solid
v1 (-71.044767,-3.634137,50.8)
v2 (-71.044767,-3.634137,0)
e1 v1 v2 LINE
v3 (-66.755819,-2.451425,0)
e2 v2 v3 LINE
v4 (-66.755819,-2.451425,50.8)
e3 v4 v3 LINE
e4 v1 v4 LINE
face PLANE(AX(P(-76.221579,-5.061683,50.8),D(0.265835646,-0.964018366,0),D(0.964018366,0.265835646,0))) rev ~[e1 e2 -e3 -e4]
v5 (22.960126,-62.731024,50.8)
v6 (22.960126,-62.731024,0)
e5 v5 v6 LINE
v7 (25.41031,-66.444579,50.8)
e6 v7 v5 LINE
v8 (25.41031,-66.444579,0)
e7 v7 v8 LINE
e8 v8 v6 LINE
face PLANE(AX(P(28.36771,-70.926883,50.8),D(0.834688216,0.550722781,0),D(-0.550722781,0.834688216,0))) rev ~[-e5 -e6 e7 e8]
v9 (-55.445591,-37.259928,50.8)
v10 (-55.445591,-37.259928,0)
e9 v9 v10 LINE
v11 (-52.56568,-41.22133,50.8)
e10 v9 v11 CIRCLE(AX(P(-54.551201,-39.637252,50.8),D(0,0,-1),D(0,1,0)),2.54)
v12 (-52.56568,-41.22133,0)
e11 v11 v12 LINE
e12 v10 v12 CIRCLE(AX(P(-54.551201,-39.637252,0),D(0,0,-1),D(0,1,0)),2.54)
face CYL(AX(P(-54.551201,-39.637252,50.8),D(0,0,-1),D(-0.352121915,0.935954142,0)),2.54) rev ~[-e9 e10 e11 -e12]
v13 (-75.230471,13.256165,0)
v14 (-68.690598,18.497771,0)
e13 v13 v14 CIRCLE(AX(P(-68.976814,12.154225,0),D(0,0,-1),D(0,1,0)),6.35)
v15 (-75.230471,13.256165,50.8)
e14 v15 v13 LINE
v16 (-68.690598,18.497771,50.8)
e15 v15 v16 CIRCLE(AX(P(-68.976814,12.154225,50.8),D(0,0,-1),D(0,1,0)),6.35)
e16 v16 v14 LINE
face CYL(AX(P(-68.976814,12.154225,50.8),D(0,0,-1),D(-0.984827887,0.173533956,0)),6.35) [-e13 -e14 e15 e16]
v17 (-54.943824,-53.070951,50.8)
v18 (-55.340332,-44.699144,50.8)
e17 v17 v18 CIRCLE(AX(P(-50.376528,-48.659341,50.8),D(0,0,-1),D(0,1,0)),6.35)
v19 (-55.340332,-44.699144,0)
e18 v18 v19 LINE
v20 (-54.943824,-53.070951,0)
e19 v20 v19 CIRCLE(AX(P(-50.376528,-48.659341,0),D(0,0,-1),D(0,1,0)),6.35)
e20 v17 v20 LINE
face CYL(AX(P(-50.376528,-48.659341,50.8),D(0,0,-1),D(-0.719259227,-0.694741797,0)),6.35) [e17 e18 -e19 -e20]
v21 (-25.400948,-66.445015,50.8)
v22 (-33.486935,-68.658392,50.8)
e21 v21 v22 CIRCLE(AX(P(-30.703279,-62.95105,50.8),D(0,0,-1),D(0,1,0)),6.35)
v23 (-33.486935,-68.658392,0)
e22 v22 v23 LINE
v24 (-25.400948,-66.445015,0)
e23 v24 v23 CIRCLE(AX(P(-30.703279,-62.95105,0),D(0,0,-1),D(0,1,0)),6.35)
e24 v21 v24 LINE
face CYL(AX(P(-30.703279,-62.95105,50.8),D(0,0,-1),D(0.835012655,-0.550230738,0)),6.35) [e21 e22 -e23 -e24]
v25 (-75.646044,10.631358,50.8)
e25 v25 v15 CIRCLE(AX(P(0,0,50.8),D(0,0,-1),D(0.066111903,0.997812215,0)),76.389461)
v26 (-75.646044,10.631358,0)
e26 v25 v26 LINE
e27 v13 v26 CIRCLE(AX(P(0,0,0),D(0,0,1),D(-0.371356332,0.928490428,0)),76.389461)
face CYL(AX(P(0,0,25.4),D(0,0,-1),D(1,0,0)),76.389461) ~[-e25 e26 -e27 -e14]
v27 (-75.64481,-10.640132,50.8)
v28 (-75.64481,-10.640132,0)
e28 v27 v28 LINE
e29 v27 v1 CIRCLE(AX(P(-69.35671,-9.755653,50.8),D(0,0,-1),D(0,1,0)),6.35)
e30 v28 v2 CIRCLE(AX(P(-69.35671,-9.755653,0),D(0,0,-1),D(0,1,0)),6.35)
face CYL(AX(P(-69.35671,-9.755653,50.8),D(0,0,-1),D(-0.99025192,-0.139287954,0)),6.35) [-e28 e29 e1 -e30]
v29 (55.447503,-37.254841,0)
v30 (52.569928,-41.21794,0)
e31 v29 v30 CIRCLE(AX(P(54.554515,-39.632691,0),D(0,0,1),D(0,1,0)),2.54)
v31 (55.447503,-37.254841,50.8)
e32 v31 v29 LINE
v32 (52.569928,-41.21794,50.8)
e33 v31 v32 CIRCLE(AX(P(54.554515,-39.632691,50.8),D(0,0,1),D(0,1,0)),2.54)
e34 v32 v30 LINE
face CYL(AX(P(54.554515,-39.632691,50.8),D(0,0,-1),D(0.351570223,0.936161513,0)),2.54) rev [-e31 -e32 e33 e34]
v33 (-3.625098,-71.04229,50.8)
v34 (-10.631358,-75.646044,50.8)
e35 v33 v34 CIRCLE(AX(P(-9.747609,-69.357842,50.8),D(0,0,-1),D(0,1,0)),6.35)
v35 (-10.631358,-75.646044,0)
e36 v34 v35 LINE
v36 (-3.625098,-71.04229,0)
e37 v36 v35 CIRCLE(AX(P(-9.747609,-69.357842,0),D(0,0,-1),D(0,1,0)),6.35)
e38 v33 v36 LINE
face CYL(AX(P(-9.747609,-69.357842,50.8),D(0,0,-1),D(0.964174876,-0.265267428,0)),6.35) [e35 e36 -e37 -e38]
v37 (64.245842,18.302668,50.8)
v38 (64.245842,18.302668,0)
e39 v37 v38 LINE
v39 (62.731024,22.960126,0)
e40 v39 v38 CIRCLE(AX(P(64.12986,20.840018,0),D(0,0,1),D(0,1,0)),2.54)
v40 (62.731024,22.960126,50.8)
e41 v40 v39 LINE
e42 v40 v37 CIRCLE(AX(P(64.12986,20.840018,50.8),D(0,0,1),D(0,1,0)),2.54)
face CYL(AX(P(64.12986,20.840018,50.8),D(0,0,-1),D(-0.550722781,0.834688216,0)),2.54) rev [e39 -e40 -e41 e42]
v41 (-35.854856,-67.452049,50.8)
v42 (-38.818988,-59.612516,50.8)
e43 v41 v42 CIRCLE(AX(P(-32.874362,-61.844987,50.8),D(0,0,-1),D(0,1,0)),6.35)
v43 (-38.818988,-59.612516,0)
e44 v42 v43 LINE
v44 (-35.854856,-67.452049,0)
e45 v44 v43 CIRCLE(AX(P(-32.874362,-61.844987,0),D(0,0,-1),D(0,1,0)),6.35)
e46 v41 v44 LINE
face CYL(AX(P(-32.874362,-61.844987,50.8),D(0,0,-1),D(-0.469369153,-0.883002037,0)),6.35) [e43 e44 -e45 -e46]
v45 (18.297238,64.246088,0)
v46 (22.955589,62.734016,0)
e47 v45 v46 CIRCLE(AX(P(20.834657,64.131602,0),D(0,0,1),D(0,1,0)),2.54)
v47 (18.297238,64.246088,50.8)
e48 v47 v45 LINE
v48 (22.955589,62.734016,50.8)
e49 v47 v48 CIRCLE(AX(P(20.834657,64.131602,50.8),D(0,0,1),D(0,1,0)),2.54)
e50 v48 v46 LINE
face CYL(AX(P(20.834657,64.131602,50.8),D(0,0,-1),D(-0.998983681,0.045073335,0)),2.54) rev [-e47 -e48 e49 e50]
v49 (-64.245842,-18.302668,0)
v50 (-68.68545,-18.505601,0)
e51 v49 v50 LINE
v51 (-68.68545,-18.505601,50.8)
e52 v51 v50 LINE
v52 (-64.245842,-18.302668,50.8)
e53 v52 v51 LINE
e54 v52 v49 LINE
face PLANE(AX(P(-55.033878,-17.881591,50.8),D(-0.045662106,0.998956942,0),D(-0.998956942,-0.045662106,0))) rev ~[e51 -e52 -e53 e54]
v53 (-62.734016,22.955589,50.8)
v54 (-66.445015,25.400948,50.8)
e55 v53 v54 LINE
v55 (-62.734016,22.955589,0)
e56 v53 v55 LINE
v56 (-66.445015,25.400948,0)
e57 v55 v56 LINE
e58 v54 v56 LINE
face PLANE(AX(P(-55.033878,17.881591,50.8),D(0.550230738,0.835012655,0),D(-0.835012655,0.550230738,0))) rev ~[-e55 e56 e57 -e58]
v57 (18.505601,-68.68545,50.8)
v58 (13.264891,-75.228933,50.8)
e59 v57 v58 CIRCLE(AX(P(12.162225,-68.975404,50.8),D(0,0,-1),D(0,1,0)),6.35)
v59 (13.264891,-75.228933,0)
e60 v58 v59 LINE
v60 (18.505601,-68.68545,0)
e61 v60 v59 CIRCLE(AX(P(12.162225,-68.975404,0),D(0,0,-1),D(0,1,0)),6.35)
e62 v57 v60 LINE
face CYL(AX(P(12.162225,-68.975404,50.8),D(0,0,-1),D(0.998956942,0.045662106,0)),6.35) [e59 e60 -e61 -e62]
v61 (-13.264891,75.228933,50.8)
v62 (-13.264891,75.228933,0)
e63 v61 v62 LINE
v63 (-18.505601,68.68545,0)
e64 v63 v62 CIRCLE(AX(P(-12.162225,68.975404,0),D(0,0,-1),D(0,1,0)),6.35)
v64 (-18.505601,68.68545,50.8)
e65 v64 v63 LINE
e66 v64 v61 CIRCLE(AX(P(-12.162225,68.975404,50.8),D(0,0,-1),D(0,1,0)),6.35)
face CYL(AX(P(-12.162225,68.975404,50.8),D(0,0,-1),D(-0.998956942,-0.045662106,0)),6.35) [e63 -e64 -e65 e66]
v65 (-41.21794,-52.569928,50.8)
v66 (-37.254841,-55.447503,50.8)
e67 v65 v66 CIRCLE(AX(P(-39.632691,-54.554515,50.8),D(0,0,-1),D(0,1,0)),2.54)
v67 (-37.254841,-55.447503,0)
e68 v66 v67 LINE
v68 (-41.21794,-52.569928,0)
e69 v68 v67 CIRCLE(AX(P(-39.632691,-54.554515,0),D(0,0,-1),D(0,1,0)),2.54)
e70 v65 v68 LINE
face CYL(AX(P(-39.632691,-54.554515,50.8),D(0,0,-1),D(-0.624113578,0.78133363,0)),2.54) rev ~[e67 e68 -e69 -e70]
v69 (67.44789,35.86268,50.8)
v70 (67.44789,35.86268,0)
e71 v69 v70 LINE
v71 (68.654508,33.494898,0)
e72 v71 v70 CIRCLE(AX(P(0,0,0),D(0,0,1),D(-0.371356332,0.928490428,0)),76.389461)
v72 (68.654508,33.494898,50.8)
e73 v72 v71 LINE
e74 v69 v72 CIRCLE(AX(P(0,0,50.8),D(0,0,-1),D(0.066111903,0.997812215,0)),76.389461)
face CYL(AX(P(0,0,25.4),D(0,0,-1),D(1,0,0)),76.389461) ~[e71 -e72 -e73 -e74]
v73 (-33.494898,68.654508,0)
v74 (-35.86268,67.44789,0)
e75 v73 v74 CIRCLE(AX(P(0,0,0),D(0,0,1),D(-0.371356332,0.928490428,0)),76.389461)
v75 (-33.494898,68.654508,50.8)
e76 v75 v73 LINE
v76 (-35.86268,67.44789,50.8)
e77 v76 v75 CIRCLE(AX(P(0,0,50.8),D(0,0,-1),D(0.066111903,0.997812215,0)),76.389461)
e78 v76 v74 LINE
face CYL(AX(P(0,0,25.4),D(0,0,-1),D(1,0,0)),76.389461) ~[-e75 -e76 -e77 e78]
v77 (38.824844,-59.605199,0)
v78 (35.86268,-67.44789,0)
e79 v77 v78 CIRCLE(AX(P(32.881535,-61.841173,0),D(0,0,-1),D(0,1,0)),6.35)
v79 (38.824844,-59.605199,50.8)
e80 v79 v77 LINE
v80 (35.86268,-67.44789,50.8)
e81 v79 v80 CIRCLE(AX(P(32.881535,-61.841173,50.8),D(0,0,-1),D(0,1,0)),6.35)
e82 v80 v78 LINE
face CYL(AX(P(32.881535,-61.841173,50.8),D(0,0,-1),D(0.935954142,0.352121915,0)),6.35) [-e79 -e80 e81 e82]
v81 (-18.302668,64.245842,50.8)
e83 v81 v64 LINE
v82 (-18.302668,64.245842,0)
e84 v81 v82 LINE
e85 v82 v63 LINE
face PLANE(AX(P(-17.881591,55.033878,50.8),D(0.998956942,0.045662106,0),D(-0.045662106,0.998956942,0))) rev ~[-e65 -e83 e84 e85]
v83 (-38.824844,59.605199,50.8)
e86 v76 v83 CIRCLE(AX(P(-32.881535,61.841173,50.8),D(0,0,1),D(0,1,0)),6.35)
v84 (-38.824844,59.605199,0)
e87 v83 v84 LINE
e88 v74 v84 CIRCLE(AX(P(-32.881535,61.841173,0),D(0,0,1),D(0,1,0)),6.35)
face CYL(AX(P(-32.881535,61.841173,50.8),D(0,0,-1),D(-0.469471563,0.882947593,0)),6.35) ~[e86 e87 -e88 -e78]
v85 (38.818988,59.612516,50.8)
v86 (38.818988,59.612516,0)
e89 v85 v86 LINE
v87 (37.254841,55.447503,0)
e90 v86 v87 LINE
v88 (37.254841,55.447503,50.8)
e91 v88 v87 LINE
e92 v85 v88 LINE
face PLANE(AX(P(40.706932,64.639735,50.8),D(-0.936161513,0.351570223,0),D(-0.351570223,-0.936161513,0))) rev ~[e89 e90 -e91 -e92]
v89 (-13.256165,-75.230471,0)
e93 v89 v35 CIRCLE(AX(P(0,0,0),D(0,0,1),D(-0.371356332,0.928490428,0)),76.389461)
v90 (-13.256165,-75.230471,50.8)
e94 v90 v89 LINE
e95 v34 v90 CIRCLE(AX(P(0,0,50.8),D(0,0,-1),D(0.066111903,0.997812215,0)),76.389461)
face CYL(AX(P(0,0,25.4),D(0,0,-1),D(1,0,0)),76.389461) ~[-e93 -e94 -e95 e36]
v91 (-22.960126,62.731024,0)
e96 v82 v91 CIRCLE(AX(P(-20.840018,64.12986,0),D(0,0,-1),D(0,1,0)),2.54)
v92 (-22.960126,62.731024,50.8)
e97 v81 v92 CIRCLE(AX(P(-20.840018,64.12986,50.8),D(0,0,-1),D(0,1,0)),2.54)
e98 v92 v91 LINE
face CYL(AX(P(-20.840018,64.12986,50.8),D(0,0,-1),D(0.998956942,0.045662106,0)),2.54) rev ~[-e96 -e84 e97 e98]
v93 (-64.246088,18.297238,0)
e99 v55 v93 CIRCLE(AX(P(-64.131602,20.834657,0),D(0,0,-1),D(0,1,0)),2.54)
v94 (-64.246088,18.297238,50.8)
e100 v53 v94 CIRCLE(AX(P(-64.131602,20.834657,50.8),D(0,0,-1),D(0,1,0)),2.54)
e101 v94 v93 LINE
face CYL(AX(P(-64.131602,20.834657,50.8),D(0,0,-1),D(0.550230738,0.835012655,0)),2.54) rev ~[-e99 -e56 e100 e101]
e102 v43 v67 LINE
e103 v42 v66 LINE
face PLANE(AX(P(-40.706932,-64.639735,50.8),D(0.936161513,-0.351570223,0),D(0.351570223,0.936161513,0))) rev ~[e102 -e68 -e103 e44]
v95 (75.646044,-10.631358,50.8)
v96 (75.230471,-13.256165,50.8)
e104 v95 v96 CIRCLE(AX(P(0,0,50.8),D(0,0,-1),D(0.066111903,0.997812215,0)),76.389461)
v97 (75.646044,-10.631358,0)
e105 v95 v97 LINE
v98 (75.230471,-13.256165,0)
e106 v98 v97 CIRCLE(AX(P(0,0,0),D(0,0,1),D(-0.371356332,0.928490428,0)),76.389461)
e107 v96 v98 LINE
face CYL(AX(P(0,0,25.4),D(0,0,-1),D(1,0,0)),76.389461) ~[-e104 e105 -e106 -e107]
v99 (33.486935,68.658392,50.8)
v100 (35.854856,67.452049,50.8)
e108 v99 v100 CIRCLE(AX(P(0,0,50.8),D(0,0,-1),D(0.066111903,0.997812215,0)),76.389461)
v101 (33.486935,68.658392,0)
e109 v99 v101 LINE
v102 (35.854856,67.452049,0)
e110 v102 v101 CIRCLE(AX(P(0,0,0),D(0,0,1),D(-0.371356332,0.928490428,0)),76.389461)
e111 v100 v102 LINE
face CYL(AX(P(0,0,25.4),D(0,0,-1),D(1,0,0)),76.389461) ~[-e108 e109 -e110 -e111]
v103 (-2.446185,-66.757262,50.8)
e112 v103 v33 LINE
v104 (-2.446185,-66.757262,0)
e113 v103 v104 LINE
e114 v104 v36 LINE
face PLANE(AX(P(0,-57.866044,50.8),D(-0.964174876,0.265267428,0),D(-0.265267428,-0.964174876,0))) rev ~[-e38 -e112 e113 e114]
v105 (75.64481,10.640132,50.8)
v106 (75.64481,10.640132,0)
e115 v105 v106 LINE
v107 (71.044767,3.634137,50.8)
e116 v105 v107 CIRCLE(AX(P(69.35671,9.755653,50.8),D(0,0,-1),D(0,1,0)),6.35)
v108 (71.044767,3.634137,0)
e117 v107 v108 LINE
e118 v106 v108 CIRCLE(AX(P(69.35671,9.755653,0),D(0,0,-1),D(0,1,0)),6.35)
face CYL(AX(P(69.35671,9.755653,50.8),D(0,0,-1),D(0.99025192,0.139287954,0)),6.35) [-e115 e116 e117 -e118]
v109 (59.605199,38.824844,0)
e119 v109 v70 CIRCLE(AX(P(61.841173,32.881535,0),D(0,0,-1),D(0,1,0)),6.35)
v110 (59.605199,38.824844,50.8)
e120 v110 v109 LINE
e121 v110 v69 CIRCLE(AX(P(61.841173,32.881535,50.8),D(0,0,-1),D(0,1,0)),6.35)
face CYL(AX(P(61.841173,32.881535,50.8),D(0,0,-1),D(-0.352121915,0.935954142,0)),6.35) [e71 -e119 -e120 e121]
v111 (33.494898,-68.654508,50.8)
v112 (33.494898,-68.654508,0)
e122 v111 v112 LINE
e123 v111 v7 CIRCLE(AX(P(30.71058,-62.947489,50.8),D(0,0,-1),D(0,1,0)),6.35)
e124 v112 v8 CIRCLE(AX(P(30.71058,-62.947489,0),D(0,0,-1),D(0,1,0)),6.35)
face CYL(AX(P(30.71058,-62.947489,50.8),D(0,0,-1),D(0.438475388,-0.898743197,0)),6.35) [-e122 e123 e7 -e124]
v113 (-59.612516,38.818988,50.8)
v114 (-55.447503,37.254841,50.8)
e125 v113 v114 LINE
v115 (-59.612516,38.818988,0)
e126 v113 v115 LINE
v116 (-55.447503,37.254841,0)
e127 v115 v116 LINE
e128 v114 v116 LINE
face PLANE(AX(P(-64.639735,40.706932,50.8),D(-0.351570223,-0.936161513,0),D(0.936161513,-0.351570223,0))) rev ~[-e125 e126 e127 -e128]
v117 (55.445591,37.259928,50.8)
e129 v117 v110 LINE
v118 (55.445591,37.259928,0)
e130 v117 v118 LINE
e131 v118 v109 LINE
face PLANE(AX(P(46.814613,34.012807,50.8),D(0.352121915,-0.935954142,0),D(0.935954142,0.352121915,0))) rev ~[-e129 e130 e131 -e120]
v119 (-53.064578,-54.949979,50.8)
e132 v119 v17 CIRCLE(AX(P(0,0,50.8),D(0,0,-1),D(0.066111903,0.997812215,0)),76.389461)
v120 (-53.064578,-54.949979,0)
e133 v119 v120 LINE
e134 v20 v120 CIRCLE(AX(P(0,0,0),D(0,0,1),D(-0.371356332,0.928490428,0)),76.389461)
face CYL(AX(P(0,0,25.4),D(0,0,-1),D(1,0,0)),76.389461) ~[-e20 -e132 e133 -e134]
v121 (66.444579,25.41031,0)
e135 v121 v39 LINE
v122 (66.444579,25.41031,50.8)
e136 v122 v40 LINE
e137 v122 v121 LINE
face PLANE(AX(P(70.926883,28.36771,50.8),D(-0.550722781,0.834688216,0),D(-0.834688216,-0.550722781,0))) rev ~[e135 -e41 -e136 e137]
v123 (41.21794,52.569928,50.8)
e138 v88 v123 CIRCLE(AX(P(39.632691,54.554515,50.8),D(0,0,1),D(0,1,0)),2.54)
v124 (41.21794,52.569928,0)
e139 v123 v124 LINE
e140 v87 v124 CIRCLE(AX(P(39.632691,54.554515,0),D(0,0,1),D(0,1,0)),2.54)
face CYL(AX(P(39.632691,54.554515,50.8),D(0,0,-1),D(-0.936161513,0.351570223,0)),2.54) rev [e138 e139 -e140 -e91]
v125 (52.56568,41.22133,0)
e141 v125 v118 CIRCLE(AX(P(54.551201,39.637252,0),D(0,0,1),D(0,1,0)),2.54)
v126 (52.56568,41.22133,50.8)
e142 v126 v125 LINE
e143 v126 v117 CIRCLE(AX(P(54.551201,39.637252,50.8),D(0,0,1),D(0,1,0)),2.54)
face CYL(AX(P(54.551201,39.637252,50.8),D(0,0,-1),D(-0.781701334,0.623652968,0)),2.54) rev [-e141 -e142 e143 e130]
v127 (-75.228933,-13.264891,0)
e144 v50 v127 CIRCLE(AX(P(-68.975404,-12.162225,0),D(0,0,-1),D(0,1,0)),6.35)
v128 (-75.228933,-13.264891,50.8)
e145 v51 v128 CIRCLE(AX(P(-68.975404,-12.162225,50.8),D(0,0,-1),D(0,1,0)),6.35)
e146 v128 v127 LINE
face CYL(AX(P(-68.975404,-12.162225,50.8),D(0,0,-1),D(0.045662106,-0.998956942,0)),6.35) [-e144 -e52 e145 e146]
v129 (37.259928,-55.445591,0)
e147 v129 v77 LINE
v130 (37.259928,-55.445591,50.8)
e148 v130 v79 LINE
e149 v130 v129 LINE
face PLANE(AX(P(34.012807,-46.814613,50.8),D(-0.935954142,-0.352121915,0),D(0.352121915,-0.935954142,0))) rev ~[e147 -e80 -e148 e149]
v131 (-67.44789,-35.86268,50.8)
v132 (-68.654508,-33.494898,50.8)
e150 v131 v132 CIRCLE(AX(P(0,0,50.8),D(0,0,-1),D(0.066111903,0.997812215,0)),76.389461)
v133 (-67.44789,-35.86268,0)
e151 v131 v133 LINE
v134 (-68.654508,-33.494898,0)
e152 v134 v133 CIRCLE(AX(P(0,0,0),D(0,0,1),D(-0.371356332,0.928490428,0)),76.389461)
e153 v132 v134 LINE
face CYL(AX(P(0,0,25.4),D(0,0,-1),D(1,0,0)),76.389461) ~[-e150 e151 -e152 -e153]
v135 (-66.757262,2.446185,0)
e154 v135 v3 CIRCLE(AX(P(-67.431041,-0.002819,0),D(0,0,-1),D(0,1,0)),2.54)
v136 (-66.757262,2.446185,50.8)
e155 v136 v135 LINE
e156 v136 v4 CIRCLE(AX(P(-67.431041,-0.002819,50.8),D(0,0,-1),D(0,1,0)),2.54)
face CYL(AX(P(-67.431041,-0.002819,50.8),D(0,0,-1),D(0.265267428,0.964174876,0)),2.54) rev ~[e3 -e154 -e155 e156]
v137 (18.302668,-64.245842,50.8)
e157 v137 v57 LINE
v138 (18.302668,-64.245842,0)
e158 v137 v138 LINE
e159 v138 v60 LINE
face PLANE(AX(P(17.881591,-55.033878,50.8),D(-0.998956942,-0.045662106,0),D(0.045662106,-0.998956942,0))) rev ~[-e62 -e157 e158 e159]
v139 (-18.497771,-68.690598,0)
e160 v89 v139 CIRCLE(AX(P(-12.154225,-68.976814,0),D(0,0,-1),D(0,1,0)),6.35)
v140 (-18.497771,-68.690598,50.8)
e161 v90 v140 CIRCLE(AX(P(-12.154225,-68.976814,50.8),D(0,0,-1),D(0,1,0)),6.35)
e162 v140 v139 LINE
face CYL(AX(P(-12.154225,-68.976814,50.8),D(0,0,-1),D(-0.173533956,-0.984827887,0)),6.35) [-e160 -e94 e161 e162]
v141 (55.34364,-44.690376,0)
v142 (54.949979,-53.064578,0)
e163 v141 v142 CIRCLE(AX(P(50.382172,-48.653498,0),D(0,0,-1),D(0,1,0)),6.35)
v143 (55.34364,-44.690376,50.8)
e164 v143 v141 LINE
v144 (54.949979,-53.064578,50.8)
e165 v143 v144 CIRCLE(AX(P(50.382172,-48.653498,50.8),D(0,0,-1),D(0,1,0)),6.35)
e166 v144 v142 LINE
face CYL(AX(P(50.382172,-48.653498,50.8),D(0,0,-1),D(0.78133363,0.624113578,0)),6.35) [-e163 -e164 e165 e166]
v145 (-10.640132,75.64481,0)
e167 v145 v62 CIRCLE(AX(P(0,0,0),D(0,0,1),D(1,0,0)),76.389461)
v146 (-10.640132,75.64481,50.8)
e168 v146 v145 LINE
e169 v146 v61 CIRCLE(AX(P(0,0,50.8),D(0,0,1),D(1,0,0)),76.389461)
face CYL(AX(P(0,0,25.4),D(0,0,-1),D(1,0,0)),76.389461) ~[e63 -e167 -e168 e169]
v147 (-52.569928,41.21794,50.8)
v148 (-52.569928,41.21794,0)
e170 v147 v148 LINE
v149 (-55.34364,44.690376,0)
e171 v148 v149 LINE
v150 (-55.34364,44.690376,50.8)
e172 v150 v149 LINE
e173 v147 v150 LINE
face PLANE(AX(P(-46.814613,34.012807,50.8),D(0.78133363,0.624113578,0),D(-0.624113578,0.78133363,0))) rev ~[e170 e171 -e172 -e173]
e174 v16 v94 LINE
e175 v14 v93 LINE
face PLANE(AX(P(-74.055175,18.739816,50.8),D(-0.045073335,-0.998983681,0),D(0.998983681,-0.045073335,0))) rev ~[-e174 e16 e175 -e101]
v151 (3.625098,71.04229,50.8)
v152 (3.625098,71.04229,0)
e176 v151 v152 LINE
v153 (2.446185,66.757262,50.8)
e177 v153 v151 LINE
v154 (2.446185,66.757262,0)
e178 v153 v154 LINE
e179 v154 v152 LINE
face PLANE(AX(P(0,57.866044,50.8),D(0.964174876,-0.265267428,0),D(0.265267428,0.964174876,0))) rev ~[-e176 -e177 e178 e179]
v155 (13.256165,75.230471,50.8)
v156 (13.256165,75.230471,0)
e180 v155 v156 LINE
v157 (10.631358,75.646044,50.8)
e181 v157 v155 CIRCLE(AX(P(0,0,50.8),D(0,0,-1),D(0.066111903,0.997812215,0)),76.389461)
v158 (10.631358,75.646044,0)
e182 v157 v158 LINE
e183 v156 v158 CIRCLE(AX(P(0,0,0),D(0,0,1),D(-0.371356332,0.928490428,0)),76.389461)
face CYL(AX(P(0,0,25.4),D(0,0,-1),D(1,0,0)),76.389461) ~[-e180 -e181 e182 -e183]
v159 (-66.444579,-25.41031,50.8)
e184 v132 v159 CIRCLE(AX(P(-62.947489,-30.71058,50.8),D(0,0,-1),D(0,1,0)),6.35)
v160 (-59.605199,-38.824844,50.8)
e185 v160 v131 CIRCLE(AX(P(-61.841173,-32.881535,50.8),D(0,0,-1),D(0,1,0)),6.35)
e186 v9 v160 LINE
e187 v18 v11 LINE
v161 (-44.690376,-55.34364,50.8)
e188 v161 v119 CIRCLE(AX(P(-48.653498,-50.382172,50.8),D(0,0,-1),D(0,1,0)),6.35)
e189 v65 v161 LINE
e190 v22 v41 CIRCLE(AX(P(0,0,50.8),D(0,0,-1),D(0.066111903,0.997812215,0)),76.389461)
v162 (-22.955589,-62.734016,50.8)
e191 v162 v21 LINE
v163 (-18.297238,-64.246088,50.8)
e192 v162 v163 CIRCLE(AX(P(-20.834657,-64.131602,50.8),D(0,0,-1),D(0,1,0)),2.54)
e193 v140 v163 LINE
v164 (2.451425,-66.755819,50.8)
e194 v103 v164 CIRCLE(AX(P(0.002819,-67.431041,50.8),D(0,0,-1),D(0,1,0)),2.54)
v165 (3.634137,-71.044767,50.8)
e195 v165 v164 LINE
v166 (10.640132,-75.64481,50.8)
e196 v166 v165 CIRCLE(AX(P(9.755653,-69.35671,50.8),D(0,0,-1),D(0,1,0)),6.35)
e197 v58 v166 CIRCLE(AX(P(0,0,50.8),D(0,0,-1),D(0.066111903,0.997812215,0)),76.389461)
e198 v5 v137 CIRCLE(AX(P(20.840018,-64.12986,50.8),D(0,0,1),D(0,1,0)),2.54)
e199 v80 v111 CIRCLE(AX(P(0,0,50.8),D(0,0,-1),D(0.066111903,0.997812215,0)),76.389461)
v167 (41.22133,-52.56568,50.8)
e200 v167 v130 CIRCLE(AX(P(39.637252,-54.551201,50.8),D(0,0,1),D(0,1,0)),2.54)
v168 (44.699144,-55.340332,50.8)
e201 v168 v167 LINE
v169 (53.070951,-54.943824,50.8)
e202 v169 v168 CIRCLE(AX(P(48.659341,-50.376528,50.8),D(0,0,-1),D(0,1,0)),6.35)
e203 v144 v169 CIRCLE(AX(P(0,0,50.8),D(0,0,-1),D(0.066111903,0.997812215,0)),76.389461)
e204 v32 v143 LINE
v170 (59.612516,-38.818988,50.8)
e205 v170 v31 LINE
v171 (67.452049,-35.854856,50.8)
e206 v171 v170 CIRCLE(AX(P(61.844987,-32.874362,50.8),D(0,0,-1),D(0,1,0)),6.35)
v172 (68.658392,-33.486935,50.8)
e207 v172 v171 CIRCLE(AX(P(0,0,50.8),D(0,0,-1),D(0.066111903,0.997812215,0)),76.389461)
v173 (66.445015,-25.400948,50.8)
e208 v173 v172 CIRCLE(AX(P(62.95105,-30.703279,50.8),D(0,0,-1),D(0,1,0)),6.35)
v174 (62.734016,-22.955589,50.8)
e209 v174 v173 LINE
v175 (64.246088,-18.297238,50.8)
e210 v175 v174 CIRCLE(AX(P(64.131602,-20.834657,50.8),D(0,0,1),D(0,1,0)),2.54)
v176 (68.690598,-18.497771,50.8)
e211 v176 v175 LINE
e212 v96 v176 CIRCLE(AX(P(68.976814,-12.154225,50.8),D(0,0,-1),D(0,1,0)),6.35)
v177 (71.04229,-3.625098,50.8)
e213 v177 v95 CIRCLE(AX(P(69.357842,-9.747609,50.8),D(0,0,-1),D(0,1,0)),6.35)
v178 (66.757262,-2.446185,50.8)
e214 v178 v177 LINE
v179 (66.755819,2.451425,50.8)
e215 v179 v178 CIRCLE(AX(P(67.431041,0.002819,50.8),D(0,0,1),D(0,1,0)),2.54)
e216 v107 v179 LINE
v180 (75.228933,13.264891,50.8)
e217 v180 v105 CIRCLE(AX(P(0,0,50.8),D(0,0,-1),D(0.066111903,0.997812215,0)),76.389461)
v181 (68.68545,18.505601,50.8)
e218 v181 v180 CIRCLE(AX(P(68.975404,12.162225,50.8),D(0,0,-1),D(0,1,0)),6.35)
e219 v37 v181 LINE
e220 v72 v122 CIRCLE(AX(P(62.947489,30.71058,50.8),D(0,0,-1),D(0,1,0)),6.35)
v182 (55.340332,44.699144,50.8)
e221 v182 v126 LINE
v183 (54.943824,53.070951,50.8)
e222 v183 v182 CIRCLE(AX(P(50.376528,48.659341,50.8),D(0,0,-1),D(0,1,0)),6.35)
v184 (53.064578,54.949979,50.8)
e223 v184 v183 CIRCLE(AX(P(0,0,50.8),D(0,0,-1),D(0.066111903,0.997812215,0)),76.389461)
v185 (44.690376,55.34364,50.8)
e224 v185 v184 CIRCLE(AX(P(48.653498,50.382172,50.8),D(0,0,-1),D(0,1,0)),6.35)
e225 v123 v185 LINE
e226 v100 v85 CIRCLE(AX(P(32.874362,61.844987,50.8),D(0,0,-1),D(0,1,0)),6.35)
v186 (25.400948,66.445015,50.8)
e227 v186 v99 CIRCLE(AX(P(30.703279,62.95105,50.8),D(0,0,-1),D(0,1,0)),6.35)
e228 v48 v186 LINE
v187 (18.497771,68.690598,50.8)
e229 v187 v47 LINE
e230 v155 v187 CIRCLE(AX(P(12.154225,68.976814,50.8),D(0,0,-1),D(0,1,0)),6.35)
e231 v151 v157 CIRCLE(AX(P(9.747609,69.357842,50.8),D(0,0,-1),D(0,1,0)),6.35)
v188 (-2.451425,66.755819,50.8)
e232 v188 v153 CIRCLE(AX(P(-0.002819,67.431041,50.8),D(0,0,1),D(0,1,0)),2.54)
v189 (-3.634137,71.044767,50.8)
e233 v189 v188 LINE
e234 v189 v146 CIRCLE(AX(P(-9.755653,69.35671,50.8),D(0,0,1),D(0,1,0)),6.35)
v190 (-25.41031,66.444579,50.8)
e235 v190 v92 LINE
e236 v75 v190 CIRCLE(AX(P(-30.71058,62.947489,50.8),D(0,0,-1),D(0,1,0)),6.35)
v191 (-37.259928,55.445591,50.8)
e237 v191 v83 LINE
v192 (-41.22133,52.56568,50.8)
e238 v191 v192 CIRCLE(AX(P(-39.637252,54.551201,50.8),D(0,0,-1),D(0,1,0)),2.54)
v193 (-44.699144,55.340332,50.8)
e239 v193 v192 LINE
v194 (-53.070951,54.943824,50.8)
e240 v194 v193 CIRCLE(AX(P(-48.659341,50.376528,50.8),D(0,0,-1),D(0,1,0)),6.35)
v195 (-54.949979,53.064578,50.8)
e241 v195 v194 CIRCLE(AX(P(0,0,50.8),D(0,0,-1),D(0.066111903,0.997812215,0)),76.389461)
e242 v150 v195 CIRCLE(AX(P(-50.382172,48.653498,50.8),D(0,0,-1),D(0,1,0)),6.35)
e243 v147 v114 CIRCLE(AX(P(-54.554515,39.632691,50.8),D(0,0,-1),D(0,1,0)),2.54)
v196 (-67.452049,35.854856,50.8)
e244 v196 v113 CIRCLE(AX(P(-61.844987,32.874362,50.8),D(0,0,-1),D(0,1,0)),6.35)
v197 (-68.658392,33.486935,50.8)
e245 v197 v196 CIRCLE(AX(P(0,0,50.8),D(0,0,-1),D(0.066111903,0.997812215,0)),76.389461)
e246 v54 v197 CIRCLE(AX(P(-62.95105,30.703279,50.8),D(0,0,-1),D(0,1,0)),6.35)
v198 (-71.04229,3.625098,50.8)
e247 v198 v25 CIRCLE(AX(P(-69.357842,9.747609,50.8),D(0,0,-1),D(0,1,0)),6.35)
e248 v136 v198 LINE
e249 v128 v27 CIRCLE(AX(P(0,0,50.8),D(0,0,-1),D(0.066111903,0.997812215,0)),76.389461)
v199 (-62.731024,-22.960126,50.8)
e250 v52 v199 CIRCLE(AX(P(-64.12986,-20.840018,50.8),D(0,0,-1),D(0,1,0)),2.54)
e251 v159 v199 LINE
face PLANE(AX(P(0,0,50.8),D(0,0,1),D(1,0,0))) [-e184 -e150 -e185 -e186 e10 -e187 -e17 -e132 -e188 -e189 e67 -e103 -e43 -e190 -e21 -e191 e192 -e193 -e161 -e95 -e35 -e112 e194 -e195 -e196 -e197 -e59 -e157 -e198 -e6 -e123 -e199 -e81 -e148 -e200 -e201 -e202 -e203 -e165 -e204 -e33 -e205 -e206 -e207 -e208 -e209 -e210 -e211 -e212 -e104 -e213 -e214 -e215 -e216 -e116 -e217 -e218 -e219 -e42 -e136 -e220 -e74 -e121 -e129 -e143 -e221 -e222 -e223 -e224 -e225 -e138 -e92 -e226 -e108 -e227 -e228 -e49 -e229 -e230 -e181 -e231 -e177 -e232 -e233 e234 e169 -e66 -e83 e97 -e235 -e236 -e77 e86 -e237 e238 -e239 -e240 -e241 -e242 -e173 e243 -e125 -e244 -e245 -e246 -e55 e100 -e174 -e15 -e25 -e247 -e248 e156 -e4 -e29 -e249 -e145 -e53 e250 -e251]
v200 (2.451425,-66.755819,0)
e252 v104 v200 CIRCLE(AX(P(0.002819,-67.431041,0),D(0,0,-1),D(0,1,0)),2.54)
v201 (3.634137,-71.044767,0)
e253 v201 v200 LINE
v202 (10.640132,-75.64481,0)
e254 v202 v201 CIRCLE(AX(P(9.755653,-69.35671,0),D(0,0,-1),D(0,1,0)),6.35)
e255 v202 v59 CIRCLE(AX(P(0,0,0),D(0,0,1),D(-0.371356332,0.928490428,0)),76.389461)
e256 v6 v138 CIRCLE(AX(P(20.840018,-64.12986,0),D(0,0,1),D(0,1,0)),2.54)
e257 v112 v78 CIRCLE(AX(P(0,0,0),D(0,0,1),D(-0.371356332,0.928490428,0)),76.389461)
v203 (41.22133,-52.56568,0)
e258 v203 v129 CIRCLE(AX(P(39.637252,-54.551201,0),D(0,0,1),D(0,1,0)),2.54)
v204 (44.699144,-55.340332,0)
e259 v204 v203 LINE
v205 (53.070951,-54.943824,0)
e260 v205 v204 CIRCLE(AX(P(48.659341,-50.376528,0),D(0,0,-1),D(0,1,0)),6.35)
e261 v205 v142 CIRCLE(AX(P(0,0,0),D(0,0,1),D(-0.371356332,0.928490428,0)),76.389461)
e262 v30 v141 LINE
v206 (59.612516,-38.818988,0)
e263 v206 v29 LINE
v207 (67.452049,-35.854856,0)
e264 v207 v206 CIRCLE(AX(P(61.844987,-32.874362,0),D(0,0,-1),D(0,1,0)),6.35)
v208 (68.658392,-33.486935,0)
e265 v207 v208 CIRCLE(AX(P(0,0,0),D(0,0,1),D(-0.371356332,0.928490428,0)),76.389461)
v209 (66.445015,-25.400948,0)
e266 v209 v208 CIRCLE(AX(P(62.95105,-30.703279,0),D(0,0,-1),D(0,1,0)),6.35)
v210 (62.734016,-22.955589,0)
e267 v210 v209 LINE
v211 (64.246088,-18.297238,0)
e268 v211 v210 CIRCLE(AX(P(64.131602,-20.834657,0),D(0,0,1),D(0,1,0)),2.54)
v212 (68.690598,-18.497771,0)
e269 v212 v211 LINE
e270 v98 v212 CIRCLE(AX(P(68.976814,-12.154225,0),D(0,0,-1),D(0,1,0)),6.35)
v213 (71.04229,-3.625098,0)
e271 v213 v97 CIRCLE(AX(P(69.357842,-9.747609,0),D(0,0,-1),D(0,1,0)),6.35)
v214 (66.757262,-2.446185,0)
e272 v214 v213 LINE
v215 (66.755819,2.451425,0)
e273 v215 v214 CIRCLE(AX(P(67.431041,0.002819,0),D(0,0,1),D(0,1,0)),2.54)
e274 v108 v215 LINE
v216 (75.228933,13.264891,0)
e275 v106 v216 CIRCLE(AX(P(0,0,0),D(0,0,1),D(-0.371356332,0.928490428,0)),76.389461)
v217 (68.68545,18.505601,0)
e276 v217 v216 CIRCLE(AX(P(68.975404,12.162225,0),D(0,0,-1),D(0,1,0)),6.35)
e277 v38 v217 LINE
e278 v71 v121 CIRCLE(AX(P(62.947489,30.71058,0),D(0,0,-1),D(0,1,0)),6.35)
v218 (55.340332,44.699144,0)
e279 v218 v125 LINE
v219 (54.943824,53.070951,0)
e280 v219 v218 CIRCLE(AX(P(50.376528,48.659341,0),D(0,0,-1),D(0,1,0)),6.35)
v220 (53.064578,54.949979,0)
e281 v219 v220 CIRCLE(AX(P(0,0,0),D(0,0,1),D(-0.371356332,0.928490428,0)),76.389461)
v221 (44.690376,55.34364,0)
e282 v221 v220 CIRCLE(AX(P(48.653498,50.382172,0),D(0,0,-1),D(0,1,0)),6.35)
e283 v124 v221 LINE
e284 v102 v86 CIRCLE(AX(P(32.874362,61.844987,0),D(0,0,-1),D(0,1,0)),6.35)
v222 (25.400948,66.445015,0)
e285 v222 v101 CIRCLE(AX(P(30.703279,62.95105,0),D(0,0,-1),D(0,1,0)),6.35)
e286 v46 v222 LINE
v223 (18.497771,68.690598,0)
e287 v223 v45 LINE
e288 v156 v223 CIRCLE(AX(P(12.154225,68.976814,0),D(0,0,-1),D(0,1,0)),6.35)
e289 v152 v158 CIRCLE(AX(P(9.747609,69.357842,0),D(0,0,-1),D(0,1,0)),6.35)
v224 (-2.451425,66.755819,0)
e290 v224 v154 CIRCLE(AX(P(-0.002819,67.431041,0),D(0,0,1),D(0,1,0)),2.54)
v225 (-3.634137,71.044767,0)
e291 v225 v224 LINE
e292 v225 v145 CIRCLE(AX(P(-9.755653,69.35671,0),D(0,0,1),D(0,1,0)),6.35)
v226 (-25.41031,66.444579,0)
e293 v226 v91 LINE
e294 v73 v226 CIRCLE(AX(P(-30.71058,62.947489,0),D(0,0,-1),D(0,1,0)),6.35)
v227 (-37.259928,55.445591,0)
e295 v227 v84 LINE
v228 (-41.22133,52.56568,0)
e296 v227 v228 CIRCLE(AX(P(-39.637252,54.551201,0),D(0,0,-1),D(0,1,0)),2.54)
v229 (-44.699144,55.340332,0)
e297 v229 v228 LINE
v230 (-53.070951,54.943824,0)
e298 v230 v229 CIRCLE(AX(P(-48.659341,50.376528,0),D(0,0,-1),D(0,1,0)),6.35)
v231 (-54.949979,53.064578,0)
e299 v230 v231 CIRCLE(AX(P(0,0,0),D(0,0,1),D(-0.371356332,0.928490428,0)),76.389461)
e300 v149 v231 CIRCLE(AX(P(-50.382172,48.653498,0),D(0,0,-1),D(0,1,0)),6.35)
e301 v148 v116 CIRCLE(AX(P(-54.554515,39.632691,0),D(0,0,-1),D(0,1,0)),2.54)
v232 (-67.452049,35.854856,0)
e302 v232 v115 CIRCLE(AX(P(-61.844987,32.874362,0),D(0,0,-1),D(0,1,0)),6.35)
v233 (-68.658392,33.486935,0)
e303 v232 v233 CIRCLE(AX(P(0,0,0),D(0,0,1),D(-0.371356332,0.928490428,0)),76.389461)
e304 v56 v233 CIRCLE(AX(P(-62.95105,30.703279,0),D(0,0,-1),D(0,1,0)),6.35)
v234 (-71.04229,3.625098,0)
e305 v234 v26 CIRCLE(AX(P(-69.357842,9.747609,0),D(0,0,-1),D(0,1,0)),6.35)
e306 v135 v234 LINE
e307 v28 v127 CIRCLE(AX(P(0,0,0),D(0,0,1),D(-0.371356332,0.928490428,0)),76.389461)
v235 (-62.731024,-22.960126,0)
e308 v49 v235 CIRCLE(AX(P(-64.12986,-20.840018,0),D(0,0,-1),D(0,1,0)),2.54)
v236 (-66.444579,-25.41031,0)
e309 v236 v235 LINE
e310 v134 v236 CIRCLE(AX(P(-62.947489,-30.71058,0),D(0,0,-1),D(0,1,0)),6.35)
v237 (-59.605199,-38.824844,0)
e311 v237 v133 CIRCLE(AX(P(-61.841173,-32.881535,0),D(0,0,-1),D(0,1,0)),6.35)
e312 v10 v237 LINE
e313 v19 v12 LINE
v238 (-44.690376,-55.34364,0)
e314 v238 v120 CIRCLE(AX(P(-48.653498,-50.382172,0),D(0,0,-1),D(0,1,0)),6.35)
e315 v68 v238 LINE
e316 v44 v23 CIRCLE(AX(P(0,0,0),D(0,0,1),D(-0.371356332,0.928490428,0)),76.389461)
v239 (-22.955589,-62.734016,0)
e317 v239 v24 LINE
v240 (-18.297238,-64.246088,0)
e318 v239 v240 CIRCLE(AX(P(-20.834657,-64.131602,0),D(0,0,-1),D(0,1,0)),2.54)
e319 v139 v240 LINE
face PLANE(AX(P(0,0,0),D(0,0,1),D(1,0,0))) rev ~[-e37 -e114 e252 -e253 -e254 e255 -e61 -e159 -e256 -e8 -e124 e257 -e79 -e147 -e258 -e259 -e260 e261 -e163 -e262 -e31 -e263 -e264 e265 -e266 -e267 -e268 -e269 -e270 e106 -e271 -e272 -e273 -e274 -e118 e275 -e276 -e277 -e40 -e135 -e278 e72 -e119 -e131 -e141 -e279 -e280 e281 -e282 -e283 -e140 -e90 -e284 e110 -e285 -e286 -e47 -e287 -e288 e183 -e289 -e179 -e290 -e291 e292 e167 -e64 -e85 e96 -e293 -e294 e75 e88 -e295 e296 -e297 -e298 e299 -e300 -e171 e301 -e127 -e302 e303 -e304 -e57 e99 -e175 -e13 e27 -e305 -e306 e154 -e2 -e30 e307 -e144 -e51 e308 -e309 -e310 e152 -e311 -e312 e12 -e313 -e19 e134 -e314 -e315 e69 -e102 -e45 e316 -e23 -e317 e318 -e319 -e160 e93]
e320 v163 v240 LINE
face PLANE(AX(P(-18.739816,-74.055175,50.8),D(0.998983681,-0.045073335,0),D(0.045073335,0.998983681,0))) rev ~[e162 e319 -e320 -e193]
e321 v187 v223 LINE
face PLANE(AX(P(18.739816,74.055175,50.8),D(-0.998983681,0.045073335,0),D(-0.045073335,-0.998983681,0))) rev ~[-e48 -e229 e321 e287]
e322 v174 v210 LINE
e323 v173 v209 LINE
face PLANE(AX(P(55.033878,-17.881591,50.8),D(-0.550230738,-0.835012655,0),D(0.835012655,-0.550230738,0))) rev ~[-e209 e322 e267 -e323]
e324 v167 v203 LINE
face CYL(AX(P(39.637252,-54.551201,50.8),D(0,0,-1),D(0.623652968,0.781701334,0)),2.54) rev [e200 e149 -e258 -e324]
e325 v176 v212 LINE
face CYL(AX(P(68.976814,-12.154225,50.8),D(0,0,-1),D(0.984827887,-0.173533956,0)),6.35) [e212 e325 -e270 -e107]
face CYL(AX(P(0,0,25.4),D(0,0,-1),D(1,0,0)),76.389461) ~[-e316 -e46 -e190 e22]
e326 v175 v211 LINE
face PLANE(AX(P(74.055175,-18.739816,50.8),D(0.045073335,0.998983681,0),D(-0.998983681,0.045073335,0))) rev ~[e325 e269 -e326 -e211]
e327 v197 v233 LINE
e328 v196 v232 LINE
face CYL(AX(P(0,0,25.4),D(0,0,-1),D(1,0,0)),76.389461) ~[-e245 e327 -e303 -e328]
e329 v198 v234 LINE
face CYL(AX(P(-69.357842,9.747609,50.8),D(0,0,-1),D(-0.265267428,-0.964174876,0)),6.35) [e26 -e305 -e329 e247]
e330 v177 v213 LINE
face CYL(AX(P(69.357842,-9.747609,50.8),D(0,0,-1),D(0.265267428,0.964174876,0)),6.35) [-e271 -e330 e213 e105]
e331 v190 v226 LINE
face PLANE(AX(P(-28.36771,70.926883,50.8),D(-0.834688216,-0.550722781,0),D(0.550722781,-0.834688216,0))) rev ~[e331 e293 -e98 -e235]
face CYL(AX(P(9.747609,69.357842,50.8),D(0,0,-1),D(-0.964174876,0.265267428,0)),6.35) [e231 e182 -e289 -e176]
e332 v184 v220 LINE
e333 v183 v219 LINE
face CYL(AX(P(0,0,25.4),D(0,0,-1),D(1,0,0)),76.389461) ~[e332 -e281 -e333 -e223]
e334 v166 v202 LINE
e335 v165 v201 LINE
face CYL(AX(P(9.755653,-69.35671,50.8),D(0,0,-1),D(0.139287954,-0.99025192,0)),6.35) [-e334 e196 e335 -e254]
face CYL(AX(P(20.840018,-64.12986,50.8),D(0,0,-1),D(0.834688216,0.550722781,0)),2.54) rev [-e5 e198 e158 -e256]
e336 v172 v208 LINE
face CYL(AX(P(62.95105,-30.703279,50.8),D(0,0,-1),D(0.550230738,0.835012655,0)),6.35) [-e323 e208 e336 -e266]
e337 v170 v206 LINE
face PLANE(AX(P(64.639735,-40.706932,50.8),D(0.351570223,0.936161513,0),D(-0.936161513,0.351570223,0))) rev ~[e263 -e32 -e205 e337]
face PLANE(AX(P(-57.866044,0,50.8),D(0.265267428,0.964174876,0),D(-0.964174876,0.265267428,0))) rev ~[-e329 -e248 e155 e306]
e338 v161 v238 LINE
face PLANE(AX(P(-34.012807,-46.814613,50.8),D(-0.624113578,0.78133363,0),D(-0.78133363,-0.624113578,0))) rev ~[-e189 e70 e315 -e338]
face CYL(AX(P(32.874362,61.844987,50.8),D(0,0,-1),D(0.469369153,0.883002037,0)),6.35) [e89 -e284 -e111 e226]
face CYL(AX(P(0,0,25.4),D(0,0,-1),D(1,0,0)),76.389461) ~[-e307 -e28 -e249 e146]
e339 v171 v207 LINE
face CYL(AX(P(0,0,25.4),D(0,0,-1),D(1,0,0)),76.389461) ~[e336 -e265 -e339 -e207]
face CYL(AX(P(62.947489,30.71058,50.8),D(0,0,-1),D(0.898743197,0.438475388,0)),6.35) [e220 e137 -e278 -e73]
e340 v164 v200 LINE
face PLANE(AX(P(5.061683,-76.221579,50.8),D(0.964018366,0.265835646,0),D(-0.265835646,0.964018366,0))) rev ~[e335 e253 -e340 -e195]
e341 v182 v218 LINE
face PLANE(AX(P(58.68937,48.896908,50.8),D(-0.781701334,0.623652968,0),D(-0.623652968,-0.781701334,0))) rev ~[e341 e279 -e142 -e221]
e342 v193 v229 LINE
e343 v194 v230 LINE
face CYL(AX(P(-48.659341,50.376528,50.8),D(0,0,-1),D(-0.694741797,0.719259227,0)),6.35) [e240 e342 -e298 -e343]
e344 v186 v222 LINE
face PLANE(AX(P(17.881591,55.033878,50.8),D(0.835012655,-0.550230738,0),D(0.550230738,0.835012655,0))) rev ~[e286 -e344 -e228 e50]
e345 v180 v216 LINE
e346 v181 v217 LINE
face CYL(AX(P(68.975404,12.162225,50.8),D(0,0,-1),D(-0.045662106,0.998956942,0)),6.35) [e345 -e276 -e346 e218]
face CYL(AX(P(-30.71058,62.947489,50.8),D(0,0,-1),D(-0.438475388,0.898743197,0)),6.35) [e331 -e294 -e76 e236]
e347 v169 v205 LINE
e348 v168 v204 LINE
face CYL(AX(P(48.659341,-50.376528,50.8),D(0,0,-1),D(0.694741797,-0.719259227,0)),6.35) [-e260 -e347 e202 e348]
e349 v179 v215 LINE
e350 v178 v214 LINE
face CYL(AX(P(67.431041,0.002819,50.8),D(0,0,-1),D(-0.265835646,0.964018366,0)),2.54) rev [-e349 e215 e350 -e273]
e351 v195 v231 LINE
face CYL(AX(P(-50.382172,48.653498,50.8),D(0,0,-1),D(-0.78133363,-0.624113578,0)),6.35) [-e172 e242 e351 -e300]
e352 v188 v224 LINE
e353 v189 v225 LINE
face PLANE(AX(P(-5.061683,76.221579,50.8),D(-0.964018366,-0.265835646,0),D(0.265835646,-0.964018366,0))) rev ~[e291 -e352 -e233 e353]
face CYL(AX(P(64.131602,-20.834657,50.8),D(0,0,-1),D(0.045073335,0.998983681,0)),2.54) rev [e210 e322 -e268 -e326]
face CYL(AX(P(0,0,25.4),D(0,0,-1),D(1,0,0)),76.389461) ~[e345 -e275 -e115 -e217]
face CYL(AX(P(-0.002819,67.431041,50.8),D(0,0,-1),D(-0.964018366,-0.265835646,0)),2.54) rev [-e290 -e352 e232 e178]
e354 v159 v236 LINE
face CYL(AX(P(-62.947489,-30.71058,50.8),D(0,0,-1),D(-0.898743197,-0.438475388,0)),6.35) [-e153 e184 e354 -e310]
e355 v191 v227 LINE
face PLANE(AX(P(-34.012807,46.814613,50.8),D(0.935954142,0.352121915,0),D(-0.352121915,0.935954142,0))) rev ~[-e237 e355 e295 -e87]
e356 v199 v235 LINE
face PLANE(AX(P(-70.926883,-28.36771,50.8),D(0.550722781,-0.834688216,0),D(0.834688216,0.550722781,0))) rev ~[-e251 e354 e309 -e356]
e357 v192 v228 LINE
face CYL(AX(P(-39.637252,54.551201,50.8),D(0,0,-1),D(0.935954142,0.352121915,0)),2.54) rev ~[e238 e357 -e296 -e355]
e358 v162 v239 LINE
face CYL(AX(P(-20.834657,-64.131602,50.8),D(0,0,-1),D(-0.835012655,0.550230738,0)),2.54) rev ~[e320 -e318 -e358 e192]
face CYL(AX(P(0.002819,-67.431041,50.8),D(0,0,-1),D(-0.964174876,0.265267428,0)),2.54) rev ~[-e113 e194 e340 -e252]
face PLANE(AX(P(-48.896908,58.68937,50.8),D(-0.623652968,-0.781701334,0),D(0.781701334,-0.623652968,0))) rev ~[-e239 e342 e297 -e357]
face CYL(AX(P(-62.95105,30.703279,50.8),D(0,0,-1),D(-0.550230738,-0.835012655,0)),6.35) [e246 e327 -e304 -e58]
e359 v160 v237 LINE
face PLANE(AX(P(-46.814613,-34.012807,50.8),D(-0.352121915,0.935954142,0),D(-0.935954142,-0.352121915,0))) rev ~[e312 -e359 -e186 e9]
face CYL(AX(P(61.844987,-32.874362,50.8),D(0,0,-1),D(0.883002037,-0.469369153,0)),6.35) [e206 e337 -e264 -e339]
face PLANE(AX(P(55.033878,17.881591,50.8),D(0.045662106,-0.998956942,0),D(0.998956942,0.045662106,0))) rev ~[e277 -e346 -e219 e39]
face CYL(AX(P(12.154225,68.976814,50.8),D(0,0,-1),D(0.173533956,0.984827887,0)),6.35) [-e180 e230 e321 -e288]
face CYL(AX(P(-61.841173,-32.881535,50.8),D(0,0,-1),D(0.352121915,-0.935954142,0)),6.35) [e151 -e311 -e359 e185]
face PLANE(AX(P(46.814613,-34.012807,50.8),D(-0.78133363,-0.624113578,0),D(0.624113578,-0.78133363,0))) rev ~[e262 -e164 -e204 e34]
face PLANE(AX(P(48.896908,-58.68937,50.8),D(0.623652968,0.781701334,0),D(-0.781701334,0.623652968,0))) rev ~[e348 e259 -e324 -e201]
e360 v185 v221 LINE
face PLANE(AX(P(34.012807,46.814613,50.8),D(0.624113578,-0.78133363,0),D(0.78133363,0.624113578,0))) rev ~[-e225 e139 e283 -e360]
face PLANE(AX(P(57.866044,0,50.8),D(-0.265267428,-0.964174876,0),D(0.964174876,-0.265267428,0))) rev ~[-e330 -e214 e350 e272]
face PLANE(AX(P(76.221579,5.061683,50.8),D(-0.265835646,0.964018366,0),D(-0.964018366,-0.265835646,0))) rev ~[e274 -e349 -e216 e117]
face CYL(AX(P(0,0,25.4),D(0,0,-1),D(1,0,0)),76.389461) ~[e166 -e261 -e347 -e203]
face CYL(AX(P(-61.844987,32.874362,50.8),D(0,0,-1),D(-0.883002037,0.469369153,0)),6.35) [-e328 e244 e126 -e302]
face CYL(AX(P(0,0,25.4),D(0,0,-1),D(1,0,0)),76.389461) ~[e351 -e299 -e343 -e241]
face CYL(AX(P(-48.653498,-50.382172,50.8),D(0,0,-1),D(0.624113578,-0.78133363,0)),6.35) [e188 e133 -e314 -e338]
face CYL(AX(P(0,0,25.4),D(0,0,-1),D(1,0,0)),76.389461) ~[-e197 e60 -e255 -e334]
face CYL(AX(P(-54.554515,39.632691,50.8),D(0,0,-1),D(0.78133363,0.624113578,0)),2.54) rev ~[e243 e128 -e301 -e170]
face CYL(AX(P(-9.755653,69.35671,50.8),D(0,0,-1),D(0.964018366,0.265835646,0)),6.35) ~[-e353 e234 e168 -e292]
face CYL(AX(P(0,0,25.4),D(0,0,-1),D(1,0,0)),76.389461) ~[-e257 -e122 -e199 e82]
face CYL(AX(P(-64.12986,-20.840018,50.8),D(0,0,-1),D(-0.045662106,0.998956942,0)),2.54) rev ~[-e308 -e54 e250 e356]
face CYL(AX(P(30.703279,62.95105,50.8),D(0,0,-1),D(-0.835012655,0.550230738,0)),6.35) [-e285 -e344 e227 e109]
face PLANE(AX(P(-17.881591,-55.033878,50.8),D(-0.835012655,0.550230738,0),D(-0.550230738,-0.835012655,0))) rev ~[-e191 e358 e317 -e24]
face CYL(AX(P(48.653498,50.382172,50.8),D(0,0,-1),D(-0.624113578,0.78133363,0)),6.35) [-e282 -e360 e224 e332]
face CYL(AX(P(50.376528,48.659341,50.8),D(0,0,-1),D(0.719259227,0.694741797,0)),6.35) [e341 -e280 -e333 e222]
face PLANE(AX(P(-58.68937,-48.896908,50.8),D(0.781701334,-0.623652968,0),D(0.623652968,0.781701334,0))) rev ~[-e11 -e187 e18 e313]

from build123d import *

# Parameters (mm, degrees)
F0_R            = 76.3894607231
F1_DEPTH        = 25.4
F2_DEPTH        = 25.4
F4_DEPTH        = 50.8
F4_COPIES_COUNT = 20
F5_R            = 6.35
F6_R            = 2.54


# Not quite as in the source:
# - a pattern or mirror of a feature is missing from the dataset's text; its kind, count and spacing are read off the source's solid


with BuildPart() as f1:
    # F0 (on Top) → F1 (new body)
    with BuildSketch(Plane.XY):
        Circle(F0_R)
    extrude(amount=F1_DEPTH)

    # F2 (add): a face of the model
    f2_faces = [f1.faces().sort_by_distance(p)[0] for p in [
        (0, 0, 25.4),
    ]]
    extrude(f2_faces, amount=F2_DEPTH)

    # F3 (on face) → F4 (cut)
    with BuildSketch(Plane.XY.offset(50.8)):
        with BuildLine():
            ThreePointArc((5.0502526328, 76.2223370011), (-0.0057278173, 76.3894605084), (-5.0616831482, 76.2215787902))
            Line((-5.0616831482, 76.2215787902), (0, 57.8660437425))
            Line((0, 57.8660437425), (5.0502526328, 76.2223370011))
        make_face()
    f4 = extrude(amount=-F4_DEPTH, mode=Mode.SUBTRACT)

    # F4_copies: F4 ×20 about axis
    f4_copies_axis = Axis((0, 0, 0), (0, 0, 1))
    for i in range(1, F4_COPIES_COUNT):
        add(f4.rotate(f4_copies_axis, i * 360 / F4_COPIES_COUNT), mode=Mode.SUBTRACT)

    # F5
    f5_edges = [f1.edges().sort_by_distance(p)[0] for p in [
        (-5.061683, 76.221579, 25.4),
        (5.050253, 76.222337, 25.4),
        (-18.750922, 74.052364, 25.4),
        (18.739816, 74.055175, 25.4),
        (28.357073, 70.931136, 25.4),
        (40.706932, 64.639735, 25.4),
        (48.888106, 58.696702, 25.4),
        (58.68937, 48.896908, 25.4),
        (64.63363, 40.716625, 25.4),
        (70.926883, 28.36771, 25.4),
        (74.052364, 18.750922, 25.4),
        (76.221579, 5.061683, 25.4),
        (76.222337, -5.050253, 25.4),
        (74.055175, -18.739816, 25.4),
        (70.931136, -28.357073, 25.4),
        (64.639735, -40.706932, 25.4),
        (58.696702, -48.888106, 25.4),
        (48.896908, -58.68937, 25.4),
        (40.716625, -64.63363, 25.4),
        (28.36771, -70.926883, 25.4),
        (18.750922, -74.052364, 25.4),
        (5.061683, -76.221579, 25.4),
        (-5.050253, -76.222337, 25.4),
        (-18.739816, -74.055175, 25.4),
        (-28.357073, -70.931136, 25.4),
        (-40.706932, -64.639735, 25.4),
        (-48.888106, -58.696702, 25.4),
        (-58.68937, -48.896908, 25.4),
        (-64.63363, -40.716625, 25.4),
        (-70.926883, -28.36771, 25.4),
        (-74.052364, -18.750922, 25.4),
        (-76.221579, -5.061683, 25.4),
        (-76.222337, 5.050253, 25.4),
        (-74.055175, 18.739816, 25.4),
        (-70.931136, 28.357073, 25.4),
        (-64.639735, 40.706932, 25.4),
        (-58.696702, 48.888106, 25.4),
        (-48.896908, 58.68937, 25.4),
        (-40.716625, 64.63363, 25.4),
        (-28.36771, 70.926883, 25.4),
    ]]
    fillet(f5_edges, radius=F5_R)

    # F6
    f6_edges = [f1.edges().sort_by_distance(p)[0] for p in [
        (0, 57.866044, 25.4),
        (-17.881591, 55.033878, 25.4),
        (17.881591, 55.033878, 25.4),
        (-34.012807, 46.814613, 25.4),
        (34.012807, 46.814613, 25.4),
        (-46.814613, 34.012807, 25.4),
        (46.814613, 34.012807, 25.4),
        (-55.033878, 17.881591, 25.4),
        (55.033878, 17.881591, 25.4),
        (-57.866044, 0, 25.4),
        (57.866044, 0, 25.4),
        (-55.033878, -17.881591, 25.4),
        (55.033878, -17.881591, 25.4),
        (-46.814613, -34.012807, 25.4),
        (46.814613, -34.012807, 25.4),
        (-34.012807, -46.814613, 25.4),
        (34.012807, -46.814613, 25.4),
        (-17.881591, -55.033878, 25.4),
        (17.881591, -55.033878, 25.4),
        (0, -57.866044, 25.4),
    ]]
    fillet(f6_edges, radius=F6_R)


solid = f1.part
